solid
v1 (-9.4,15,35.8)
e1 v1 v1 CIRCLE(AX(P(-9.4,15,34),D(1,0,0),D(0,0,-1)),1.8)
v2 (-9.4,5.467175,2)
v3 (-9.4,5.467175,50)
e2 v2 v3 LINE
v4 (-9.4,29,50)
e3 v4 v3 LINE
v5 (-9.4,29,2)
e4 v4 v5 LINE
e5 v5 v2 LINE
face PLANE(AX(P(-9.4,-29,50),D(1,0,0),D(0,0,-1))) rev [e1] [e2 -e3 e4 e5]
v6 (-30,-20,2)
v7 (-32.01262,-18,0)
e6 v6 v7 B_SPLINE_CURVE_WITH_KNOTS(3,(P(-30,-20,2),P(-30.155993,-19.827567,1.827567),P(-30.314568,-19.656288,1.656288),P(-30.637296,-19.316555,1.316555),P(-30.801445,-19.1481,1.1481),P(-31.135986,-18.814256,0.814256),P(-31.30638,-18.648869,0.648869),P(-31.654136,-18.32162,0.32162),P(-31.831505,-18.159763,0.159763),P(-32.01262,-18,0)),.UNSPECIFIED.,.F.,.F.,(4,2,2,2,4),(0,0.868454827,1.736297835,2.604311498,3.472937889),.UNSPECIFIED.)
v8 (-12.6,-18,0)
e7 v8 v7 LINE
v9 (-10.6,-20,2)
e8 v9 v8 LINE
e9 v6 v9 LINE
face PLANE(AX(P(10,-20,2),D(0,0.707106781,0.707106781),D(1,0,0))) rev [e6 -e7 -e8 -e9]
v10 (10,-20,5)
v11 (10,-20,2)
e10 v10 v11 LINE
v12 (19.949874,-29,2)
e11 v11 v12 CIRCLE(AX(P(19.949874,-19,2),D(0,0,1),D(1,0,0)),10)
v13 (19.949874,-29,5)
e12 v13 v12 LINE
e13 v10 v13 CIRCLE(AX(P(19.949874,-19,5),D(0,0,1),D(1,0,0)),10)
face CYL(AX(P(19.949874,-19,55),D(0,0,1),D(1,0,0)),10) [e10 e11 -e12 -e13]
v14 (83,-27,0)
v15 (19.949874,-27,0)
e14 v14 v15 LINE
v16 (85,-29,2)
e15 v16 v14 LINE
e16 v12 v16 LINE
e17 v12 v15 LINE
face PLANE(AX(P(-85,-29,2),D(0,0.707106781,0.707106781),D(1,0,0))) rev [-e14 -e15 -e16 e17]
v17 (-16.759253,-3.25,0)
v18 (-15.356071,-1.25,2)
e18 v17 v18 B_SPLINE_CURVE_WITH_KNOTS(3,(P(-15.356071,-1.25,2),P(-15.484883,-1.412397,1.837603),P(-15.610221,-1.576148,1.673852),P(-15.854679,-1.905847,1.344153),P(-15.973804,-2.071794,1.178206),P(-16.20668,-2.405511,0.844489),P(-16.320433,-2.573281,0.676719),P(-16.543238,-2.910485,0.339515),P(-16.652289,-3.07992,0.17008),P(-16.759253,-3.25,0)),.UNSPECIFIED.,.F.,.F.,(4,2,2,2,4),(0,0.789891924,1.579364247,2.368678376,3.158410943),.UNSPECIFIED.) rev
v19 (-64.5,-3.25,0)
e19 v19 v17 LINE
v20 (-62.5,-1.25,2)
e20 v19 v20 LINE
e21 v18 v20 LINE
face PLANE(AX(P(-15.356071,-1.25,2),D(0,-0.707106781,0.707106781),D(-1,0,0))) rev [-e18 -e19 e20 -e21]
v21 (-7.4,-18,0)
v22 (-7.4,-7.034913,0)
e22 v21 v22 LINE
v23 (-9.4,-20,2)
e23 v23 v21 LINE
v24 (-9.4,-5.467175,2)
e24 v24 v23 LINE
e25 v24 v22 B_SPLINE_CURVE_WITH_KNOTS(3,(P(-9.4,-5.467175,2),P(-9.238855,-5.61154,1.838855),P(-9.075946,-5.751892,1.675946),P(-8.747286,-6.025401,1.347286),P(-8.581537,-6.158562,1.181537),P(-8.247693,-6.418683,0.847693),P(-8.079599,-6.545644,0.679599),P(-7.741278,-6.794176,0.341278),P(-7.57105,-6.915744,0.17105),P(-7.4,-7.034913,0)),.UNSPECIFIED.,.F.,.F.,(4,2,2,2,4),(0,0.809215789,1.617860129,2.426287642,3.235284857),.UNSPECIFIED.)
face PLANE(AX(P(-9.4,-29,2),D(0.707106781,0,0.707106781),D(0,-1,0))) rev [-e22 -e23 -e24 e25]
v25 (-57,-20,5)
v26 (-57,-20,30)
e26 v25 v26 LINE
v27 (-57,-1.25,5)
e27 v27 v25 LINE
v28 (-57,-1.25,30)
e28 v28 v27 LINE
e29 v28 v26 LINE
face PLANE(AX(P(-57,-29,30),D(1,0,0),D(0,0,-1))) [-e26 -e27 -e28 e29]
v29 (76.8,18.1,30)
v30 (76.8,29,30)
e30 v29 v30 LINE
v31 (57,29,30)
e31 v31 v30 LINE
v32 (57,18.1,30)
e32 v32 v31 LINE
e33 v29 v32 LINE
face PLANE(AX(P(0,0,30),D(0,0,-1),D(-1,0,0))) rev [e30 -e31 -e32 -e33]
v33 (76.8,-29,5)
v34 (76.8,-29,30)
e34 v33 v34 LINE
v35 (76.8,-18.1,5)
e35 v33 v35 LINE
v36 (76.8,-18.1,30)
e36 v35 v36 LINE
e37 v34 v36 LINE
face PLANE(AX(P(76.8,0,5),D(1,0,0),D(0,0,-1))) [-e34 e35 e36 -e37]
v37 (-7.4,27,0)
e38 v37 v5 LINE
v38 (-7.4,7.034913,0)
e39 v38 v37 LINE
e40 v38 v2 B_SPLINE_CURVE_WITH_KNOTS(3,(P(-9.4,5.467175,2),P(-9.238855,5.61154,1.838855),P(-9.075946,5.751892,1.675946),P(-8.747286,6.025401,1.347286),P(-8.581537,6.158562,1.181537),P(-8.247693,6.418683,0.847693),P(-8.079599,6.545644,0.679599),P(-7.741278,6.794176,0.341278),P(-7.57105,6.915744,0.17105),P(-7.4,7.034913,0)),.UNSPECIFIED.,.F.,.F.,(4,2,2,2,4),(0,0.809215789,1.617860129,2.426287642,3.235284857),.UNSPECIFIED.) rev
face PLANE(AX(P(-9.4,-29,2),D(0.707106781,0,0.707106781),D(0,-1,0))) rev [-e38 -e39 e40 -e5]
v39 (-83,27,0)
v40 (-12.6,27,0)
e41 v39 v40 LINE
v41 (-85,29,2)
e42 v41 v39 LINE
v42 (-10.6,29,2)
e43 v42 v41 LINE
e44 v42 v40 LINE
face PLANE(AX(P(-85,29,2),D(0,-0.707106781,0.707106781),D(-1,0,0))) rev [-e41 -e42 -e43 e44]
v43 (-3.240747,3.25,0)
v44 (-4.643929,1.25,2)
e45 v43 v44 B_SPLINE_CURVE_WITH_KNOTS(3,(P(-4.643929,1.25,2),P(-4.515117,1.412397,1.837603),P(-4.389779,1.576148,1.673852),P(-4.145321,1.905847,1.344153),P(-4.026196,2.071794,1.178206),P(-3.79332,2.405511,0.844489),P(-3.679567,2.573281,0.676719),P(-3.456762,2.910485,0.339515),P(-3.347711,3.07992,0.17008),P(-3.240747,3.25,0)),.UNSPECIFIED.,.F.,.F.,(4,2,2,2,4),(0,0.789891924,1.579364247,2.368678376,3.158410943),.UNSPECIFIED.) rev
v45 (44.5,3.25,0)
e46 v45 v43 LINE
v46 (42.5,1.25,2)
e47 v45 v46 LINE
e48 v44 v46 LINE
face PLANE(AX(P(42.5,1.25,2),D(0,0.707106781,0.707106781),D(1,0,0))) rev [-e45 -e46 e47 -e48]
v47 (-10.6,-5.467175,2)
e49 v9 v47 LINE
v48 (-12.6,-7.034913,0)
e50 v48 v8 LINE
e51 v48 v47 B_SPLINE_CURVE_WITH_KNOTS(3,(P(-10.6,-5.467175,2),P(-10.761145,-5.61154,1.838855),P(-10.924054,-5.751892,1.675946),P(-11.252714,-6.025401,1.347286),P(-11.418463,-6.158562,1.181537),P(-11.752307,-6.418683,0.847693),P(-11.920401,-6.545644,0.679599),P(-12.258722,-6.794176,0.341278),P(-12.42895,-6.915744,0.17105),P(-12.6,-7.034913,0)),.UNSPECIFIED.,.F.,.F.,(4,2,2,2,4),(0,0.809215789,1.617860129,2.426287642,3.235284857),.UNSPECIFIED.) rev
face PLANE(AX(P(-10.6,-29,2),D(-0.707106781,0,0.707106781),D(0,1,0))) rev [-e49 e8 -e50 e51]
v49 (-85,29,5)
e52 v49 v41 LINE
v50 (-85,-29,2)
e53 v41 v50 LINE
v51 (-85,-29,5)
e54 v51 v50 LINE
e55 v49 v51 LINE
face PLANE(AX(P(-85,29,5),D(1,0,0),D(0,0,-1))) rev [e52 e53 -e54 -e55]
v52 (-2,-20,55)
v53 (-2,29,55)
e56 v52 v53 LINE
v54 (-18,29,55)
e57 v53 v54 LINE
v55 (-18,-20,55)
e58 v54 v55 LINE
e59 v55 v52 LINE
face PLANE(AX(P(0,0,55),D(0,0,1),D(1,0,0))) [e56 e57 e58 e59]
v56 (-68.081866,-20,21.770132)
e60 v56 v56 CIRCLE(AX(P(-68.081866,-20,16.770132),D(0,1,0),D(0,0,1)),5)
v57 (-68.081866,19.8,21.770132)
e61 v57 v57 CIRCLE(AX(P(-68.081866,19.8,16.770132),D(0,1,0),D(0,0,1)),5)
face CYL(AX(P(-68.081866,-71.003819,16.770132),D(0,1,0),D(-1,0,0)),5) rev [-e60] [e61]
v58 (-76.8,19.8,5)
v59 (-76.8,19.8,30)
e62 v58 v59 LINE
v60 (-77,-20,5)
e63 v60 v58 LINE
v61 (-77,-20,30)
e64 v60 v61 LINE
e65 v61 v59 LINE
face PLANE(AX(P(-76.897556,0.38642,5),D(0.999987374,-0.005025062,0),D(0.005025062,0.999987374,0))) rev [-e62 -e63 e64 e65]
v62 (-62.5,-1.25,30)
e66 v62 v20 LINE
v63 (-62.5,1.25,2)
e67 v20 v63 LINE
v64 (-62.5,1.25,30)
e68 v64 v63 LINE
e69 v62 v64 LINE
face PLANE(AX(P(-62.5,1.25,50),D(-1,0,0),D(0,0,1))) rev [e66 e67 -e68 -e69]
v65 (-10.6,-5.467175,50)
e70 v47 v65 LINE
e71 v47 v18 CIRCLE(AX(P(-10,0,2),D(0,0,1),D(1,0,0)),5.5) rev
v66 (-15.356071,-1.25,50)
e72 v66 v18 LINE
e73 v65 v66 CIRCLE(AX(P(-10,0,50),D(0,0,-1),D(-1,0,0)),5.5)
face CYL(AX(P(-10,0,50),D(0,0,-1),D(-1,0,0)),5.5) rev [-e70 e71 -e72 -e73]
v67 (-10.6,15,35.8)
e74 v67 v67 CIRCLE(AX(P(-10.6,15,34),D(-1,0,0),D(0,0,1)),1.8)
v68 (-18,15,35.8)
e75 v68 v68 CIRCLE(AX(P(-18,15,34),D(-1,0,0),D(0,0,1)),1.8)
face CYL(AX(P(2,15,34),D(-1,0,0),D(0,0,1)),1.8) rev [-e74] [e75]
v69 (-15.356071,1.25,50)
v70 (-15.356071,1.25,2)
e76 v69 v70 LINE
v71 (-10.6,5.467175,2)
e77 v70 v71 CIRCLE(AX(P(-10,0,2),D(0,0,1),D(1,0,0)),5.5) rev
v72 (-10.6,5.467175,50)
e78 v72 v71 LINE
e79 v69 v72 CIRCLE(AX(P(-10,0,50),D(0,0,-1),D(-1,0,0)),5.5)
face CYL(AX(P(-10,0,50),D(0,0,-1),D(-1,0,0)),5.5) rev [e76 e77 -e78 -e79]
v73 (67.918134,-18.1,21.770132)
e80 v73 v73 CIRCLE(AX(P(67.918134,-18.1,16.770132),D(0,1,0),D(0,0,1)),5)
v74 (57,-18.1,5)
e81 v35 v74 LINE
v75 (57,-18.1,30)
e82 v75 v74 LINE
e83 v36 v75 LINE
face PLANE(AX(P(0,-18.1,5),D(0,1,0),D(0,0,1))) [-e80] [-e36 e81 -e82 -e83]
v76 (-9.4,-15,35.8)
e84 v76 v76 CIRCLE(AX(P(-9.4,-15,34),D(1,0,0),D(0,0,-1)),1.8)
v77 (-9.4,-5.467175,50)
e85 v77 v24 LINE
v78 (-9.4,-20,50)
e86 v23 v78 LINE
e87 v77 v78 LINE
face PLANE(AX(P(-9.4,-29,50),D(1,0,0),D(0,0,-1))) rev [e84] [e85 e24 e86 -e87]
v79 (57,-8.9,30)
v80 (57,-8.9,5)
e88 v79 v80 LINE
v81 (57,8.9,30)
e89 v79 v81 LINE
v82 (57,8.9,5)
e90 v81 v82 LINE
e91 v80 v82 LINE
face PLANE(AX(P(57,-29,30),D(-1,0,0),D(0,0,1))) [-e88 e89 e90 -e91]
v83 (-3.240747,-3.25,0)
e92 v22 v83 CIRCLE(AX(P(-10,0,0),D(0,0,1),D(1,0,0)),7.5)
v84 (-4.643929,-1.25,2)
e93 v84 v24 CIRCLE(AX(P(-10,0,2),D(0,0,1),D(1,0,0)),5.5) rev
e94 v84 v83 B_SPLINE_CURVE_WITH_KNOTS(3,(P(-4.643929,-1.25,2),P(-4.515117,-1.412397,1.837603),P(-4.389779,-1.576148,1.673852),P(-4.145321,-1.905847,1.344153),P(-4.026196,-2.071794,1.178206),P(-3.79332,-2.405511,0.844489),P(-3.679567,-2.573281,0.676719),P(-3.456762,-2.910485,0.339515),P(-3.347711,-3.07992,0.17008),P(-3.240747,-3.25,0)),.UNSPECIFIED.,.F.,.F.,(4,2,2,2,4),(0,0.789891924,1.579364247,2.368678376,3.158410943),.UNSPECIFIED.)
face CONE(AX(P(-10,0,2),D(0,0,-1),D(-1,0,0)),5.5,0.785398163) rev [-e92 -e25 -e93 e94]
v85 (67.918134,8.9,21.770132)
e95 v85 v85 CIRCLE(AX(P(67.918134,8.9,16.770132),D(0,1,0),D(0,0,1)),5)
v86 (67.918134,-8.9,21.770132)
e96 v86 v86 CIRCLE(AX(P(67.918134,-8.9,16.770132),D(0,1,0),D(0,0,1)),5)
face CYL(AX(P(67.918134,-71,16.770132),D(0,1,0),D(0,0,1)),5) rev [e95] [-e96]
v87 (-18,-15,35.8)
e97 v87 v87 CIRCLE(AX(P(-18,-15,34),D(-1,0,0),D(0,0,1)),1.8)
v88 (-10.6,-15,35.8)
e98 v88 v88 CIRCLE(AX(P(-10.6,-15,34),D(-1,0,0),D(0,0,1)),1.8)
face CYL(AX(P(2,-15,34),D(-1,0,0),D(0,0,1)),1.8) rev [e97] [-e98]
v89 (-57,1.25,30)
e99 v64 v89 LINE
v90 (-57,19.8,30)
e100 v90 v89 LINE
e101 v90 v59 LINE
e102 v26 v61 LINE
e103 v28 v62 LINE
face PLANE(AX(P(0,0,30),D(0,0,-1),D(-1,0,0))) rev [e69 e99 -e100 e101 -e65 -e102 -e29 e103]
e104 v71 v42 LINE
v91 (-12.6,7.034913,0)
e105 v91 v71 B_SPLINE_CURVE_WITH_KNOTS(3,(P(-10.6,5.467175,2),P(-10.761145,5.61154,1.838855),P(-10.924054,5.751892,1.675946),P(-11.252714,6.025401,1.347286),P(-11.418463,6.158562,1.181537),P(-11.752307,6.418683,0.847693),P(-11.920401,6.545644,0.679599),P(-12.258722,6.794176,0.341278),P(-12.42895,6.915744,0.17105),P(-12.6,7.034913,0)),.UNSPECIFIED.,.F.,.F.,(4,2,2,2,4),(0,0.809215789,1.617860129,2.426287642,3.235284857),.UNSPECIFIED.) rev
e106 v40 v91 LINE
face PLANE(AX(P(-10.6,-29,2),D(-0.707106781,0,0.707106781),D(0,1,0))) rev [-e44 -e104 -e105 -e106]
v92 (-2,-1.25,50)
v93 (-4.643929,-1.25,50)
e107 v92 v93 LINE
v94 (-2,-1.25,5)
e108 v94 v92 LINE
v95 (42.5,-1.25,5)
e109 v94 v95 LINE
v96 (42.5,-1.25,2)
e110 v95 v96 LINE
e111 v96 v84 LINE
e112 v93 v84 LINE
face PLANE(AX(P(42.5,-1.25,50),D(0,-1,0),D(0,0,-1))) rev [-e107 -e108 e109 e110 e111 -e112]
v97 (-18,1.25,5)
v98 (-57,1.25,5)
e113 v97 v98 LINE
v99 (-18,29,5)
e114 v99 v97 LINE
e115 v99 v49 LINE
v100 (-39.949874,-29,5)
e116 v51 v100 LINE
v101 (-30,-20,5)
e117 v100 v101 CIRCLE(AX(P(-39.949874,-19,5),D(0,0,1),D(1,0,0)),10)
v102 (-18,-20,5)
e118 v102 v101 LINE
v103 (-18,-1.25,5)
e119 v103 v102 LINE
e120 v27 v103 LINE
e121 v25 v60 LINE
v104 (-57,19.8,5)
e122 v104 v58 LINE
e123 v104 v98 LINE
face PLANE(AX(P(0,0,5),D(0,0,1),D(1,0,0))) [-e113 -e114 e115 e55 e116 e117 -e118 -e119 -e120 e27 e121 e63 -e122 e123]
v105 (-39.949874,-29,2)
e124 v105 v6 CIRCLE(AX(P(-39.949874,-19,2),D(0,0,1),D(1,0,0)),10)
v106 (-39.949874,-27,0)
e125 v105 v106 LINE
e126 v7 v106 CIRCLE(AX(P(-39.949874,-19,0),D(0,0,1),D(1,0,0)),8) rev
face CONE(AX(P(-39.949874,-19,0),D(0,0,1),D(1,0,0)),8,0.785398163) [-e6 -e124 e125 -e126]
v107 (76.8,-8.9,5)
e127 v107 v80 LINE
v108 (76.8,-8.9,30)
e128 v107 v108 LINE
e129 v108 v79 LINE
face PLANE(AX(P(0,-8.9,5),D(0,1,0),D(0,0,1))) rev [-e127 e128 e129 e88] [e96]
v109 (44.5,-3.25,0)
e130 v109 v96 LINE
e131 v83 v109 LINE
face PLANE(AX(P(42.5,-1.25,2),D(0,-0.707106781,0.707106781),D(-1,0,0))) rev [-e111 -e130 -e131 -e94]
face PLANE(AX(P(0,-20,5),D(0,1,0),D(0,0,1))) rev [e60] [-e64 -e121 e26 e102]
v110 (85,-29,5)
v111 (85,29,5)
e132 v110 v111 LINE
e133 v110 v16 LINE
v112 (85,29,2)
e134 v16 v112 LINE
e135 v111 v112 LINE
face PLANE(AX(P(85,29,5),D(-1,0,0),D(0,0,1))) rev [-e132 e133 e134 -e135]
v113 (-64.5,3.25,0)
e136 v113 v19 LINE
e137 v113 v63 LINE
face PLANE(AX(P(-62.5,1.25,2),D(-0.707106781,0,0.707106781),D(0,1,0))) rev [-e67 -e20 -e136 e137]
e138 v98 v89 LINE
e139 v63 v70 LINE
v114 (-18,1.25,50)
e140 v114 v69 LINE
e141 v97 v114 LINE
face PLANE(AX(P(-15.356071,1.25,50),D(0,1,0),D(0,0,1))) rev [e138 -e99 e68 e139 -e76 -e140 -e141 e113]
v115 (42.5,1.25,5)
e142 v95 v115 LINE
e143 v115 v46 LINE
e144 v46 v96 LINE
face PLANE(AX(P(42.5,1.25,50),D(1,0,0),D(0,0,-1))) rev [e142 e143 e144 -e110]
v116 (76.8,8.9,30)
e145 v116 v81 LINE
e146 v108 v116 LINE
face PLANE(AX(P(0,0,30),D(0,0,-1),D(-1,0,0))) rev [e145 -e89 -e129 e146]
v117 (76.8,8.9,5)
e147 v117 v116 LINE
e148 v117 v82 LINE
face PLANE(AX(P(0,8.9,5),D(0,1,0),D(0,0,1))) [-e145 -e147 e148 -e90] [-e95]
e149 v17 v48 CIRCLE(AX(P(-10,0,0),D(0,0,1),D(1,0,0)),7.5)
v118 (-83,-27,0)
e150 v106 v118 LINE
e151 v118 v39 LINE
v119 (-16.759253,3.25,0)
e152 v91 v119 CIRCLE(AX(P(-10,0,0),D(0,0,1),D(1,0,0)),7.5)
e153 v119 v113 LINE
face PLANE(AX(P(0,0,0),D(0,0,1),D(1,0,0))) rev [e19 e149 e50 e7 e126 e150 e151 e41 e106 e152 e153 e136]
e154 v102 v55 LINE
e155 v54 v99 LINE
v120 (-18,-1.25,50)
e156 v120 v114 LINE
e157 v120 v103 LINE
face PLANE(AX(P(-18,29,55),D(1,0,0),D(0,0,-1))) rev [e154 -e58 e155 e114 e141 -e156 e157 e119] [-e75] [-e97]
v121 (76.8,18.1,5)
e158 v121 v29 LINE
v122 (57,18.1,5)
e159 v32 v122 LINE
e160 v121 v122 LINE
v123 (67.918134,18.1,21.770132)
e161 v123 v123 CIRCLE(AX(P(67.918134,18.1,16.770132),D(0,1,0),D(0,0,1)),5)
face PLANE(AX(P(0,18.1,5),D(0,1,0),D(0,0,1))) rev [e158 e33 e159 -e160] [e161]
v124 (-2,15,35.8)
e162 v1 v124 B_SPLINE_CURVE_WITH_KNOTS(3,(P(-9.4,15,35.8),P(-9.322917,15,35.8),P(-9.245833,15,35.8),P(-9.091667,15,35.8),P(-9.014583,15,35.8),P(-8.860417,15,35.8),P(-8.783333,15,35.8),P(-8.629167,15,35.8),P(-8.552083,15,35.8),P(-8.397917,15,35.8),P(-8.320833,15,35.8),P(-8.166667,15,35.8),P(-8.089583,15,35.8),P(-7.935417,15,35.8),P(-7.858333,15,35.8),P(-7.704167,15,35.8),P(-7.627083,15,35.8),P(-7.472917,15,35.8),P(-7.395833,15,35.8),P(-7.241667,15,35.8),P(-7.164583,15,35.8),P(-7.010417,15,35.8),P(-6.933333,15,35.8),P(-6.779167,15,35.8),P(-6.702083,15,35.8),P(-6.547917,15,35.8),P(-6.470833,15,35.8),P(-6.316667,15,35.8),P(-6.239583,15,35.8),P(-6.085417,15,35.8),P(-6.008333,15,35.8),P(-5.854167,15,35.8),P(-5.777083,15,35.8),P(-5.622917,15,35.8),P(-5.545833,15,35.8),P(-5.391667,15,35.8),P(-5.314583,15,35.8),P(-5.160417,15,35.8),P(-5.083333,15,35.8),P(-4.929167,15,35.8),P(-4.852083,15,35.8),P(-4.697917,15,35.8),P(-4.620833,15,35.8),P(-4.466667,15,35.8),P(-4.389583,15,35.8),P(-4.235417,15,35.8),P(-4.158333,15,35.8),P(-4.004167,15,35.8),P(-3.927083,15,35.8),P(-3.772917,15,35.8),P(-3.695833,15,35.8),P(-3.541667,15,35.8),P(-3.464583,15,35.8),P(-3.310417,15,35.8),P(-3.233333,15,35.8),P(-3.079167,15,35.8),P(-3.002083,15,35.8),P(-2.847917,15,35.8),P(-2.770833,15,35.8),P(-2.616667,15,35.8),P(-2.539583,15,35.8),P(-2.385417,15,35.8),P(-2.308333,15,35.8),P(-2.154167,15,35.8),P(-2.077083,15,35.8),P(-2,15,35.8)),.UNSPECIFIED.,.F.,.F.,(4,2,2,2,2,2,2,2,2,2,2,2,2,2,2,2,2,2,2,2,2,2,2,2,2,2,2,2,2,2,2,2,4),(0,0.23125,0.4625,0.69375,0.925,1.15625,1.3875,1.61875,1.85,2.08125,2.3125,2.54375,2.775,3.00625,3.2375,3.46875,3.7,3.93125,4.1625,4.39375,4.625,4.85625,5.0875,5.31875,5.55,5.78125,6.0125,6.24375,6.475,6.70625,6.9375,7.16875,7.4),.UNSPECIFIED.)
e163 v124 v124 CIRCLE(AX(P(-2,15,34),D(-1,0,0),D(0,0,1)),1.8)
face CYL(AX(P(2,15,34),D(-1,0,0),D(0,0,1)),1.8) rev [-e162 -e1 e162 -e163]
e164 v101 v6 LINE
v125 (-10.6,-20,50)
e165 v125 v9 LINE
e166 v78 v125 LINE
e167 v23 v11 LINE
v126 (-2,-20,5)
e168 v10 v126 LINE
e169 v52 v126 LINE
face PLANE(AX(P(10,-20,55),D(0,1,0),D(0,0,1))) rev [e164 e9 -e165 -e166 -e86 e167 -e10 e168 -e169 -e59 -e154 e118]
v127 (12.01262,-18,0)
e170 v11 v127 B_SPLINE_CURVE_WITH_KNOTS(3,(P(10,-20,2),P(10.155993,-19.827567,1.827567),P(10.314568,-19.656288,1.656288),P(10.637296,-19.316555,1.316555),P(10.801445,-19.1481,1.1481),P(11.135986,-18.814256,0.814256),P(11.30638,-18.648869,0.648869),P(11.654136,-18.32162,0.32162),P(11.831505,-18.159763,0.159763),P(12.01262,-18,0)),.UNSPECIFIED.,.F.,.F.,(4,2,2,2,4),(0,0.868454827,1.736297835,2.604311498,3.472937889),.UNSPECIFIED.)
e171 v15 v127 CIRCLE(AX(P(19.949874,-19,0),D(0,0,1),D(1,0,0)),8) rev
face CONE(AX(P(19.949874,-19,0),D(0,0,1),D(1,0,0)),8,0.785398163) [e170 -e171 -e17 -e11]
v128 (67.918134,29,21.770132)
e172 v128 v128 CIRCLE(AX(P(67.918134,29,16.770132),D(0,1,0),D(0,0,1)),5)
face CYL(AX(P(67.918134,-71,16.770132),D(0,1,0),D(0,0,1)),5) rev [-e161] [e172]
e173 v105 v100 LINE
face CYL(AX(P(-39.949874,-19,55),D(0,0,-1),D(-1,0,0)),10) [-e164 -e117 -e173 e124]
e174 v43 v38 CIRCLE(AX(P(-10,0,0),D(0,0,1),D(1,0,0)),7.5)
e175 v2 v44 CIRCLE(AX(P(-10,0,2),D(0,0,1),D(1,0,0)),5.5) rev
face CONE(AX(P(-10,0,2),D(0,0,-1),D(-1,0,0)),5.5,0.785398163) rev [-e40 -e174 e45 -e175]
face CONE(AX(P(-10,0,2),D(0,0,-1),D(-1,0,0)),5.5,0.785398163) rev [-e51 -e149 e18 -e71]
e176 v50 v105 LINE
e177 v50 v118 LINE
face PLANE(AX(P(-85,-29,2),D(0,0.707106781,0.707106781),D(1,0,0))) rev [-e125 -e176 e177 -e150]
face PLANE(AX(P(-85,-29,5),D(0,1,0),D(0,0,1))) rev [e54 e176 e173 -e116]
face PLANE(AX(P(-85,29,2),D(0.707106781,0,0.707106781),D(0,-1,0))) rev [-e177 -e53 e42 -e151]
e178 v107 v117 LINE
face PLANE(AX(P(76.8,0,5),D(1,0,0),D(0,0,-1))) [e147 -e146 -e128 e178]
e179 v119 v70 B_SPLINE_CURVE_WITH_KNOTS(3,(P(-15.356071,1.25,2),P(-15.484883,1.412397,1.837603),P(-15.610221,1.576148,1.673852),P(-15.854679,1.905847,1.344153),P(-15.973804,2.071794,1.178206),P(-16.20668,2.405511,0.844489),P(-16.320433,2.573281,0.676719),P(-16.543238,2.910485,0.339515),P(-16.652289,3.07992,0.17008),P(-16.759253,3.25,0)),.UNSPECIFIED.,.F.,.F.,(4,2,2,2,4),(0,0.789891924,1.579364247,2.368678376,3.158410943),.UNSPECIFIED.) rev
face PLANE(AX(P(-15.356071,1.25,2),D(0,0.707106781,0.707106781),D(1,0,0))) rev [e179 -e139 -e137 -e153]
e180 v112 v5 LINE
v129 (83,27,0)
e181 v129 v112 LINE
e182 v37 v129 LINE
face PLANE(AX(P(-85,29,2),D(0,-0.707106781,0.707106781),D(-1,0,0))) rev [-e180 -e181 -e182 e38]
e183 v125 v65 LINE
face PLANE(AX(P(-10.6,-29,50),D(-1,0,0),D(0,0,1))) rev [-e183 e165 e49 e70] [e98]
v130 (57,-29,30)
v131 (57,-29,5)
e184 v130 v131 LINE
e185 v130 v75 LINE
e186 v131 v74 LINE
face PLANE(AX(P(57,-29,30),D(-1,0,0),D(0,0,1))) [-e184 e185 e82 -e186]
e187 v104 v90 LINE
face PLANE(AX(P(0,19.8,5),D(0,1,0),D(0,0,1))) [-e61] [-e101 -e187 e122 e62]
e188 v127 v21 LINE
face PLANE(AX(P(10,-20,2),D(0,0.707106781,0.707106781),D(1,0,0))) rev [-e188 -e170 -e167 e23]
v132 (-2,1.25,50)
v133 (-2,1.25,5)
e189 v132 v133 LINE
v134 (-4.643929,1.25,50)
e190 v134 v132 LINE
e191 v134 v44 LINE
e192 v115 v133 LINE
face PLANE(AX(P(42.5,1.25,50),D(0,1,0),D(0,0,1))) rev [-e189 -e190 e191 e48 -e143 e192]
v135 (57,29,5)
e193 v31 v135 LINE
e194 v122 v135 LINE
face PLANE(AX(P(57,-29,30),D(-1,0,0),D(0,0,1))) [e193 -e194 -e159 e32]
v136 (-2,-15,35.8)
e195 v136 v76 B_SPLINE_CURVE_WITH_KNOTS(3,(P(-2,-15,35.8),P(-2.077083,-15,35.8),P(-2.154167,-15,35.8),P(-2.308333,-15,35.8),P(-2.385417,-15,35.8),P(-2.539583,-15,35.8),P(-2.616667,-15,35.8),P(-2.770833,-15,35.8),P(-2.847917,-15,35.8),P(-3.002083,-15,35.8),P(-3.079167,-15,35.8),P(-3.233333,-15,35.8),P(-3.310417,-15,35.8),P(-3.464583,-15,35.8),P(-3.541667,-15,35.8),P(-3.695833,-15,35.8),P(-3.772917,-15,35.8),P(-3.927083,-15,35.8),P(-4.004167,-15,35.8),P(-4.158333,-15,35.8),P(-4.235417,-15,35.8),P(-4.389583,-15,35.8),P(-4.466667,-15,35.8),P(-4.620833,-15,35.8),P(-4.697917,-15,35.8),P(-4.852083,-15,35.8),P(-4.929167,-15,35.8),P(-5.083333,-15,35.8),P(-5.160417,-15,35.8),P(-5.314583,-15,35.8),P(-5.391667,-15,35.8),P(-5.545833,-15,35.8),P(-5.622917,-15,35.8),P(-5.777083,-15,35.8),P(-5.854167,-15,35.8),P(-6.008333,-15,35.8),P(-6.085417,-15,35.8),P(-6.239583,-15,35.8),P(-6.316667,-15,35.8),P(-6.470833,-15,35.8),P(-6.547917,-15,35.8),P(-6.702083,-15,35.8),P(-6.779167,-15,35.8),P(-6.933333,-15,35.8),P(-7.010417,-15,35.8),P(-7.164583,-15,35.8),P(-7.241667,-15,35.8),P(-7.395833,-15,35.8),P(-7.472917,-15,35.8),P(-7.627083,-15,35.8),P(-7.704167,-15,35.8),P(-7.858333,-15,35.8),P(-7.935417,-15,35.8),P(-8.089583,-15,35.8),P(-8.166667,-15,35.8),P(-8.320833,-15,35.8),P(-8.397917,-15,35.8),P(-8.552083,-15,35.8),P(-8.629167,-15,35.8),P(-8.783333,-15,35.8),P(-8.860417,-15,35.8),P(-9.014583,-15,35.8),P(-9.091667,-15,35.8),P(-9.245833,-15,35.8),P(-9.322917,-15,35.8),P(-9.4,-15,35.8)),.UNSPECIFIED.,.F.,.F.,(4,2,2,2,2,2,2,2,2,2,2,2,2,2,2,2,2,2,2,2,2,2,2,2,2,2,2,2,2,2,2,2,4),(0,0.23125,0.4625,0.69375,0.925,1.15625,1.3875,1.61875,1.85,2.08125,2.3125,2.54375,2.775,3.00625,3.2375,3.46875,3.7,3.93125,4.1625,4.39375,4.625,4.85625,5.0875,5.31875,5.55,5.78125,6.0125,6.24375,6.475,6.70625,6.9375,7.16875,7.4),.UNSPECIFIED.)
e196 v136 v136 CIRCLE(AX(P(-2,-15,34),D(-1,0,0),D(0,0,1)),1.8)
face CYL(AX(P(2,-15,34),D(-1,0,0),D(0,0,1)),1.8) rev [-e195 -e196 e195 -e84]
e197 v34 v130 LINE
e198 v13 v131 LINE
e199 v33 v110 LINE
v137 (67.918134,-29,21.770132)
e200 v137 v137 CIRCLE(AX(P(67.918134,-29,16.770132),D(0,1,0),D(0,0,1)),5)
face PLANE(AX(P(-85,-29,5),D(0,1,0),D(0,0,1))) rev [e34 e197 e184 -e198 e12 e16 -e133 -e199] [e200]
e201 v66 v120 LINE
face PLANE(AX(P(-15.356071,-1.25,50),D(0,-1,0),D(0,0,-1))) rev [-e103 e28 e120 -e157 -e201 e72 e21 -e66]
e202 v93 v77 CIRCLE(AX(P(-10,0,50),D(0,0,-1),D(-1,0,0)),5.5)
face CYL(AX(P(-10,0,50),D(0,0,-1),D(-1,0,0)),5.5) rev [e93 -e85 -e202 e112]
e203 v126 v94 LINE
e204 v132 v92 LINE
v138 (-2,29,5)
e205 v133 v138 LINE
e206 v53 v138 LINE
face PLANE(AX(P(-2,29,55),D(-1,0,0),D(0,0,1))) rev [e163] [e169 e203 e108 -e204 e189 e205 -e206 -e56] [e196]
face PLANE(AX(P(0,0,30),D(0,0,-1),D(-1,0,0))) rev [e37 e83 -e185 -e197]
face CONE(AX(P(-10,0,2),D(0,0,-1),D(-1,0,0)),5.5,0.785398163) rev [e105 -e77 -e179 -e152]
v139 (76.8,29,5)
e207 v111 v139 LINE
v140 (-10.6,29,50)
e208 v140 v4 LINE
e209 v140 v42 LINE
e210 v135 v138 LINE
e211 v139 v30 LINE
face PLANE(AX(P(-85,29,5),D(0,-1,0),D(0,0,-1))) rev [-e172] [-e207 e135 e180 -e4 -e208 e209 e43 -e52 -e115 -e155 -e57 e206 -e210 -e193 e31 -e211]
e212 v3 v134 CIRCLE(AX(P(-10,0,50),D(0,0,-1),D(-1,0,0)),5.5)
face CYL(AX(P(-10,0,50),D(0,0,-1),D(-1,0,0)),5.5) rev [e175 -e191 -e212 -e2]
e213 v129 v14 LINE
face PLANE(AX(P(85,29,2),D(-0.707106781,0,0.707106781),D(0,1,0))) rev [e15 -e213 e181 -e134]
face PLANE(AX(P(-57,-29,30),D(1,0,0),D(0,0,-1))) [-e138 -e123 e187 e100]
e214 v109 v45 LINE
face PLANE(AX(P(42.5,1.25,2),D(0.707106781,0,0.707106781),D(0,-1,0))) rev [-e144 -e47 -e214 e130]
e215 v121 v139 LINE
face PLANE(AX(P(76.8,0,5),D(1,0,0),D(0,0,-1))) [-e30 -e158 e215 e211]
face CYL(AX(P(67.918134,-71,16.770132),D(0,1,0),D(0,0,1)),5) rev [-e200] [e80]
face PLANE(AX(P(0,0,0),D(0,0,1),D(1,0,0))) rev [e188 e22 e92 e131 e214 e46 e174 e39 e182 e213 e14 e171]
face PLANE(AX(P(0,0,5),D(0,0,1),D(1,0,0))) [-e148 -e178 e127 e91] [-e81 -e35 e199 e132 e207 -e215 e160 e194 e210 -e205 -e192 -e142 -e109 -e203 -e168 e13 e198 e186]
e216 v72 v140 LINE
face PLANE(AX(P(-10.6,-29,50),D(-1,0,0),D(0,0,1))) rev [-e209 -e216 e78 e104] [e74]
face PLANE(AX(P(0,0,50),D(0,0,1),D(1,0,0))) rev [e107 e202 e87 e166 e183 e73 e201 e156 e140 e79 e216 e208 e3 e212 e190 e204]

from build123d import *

# Parameters (mm, degrees)
SKETCH1_W           = 170
SKETCH1_H           = 58
BOSS_EXTRUDE1_DEPTH = 5
SKETCH2_W           = 28
SKETCH2_H           = 58
BOSS_EXTRUDE2_DEPTH = 25
CUT_EXTRUDE4_DEPTH  = 25
SKETCH6_W           = 16
SKETCH6_H           = 58
BOSS_EXTRUDE3_DEPTH = 50
SKETCH7_W           = 1.2
SKETCH7_H           = 58
CUT_EXTRUDE5_DEPTH  = 50
CUT_EXTRUDE6_DEPTH  = 50
SKETCH9_R           = 1.8
CUT_EXTRUDE7_DEPTH  = 20
HOLE3_START         = -20
HOLE3_OUTLINE_R     = 5
HOLE3_DEPTH         = 39.8
HOLE4_START         = -29
HOLE4_OUTLINE_R     = 5
HOLE4_DEPTH         = 58
SKETCH12_W          = 40
SKETCH12_H          = 9
CUT_EXTRUDE8_DEPTH  = 106.313816757
FILLET1_R           = 10
CHAMFER1_SIZE       = 2


# Read off the part's stored shape, not the designer's step: Hole3, Hole4
with BuildPart() as part:
    # Sketch1 → Boss-Extrude1 (new body)
    with BuildSketch(Plane.XY):
        Rectangle(SKETCH1_W, SKETCH1_H)
    extrude(amount=BOSS_EXTRUDE1_DEPTH)

    # Sketch2 → Boss-Extrude2 (add)
    with BuildSketch(Plane(origin=(0, 0, 5), x_dir=(-1, 0, 0), z_dir=(0, 0, -1))):
        with Locations((71, 0)):
            Rectangle(SKETCH2_W, SKETCH2_H)
        with Locations((-71, 0)):
            Rectangle(SKETCH2_W, SKETCH2_H)
    extrude(amount=-BOSS_EXTRUDE2_DEPTH)

    # Sketch3 → Cut-Extrude4 (cut)
    with BuildSketch(Plane.XY.offset(30)):
        Polygon((-57, -29), (-57, -20), (-77, -20), (-76.8, 19.8), (-57, 19.8), (-57, 29), (-85, 29), (-85, -29), align=None)
        Polygon((56, 8.9), (56, 18.1), (76.8, 18.1), (76.8, 29), (85, 29), (85, -29), (76.8, -29), (76.8, -18.1), (56, -18.1), (56, -8.9), (76.8, -8.9), (76.8, 8.9), align=None)
    extrude(amount=-CUT_EXTRUDE4_DEPTH, mode=Mode.SUBTRACT)

    # Sketch6 → Boss-Extrude3 (add)
    with BuildSketch(Plane.XY.offset(5)):
        with Locations((-10, 0)):
            Rectangle(SKETCH6_W, SKETCH6_H)
    extrude(amount=BOSS_EXTRUDE3_DEPTH)

    # Sketch7 → Cut-Extrude5 (cut)
    with BuildSketch(Plane(origin=(0, 0, 0), x_dir=(-1, 0, 0), z_dir=(0, 0, -1))):
        with Locations((10, 0)):
            Rectangle(SKETCH7_W, SKETCH7_H)
    extrude(amount=-CUT_EXTRUDE5_DEPTH, mode=Mode.SUBTRACT)

    # Sketch8 → Cut-Extrude6 (cut)
    with BuildSketch(Plane(origin=(0, 0, 0), x_dir=(-1, 0, 0), z_dir=(0, 0, -1))):
        with BuildLine():
            Line((15.356071321, 1.25), (62.5, 1.25))
            Line((62.5, 1.25), (62.5, -1.25))
            Line((62.5, -1.25), (15.356071321, -1.25))
            ThreePointArc((15.356071321, -1.25), (10, -5.5), (4.643928679, -1.25))
            Line((4.643928679, -1.25), (-42.5, -1.25))
            Line((-42.5, -1.25), (-42.5, 1.25))
            Line((-42.5, 1.25), (4.643928679, 1.25))
            ThreePointArc((4.643928679, 1.25), (10, 5.5), (15.356071321, 1.25))
        make_face()
    extrude(amount=-CUT_EXTRUDE6_DEPTH, mode=Mode.SUBTRACT)

    # Sketch9 → Cut-Extrude7 (cut)
    with BuildSketch(Plane.ZY.offset(18)):
        with Locations((34, 15)):
            Circle(SKETCH9_R)
        with Locations((34, -15)):
            Circle(SKETCH9_R)
    extrude(amount=-CUT_EXTRUDE7_DEPTH, mode=Mode.SUBTRACT)

    # Hole3 outline → Hole3 (cut)
    with BuildSketch(Plane(origin=(0, 0, 0), x_dir=(1, 0, 0), z_dir=(0, 1, 0)).offset(HOLE3_START)):
        with Locations((-68.081865543, -16.770132162)):
            Circle(HOLE3_OUTLINE_R)
    extrude(amount=HOLE3_DEPTH, mode=Mode.SUBTRACT)

    # Hole4 outline → Hole4 (cut)
    with BuildSketch(Plane(origin=(0, 0, 0), x_dir=(1, 0, 0), z_dir=(0, 1, 0)).offset(HOLE4_START)):
        with Locations((67.918134457, -16.770132162)):
            Circle(HOLE4_OUTLINE_R)
    extrude(amount=HOLE4_DEPTH, mode=Mode.SUBTRACT)

    # Sketch12 → Cut-Extrude8 (cut, through all)
    with BuildSketch(Plane(origin=(0, 0, 0), x_dir=(-1, 0, 0), z_dir=(0, 0, -1))):
        with Locations((10, -24.5)):
            Rectangle(SKETCH12_W, SKETCH12_H)
    extrude(amount=-CUT_EXTRUDE8_DEPTH, mode=Mode.SUBTRACT)

    # Fillet1
    # the kernel refuses this fillet: 10 mm, written as the material it takes off along each edge
    with BuildSketch(Plane(origin=(-30, -29, -24.874685928), x_dir=(0, 1, 0), z_dir=(0, 0, 1))) as fillet1_piece_1:
        with BuildLine():
            CenterArc((10, 9.949874371), FILLET1_R, 180, 84.260829523)
            Line((0, 9.949874371), (-0.2, 9.949874371))
            Line((-0.2, 9.949874371), (-0.2, 0))
            Line((-0.2, 0), (0, -0.2))
            ThreePointArc((0, -0.2), (4.5, -0.2), (8.98, -0.198997487))
            Line((8.98, -0.198997487), (9, 0))
        make_face()
    extrude(amount=54.749371855, mode=Mode.SUBTRACT)
    with BuildSketch(Plane(origin=(10, -29, -24.874685928), x_dir=(0, 1, 0), z_dir=(0, 0, 1))) as fillet1_piece_2:
        with BuildLine():
            CenterArc((10, -9.949874371), FILLET1_R, 95.739170477, 84.260829523)
            Line((0, -9.949874371), (-0.2, -9.949874371))
            Line((-0.2, -9.949874371), (-0.2, 0))
            Line((-0.2, 0), (0, 0.2))
            ThreePointArc((0, 0.2), (4.5, 0.2), (8.98, 0.198997487))
            Line((8.98, 0.198997487), (9, 0))
        make_face()
    extrude(amount=54.749371855, mode=Mode.SUBTRACT)

    # Chamfer1
    chamfer1_edges = [part.edges().sort_by_distance(p)[0] for p in [
        (-47.8, 29, 0),
        (-9.4, 17.233587387, 0),
        (-10.6, 17.233587387, 0),
        (-9.4, -12.733587387, 0),
        (-6.351049855, -4.115235453, 0),
        (-6.351049855, 4.115235453, 0),
        (18.928035661, 1.25, 0),
        (42.5, 0, 0),
        (18.928035661, -1.25, 0),
        (-13.648950145, 4.115235453, 0),
        (-13.648950145, -4.115235453, 0),
        (-38.928035661, -1.25, 0),
        (-62.5, 0, 0),
        (-38.928035661, 1.25, 0),
        (-10.6, -12.733587387, 0),
        (0.3, -20, 0),
        (-20.3, -20, 0),
        (-33.241670439, -26.416198487, 0),
        (52.474937186, -29, 0),
        (13.241670439, -26.416198487, 0),
        (37.8, 29, 0),
        (85, 0, 0),
        (-62.474937186, -29, 0),
        (-85, 0, 0),
    ]]
    chamfer(chamfer1_edges, length=CHAMFER1_SIZE)


solid = part.part
